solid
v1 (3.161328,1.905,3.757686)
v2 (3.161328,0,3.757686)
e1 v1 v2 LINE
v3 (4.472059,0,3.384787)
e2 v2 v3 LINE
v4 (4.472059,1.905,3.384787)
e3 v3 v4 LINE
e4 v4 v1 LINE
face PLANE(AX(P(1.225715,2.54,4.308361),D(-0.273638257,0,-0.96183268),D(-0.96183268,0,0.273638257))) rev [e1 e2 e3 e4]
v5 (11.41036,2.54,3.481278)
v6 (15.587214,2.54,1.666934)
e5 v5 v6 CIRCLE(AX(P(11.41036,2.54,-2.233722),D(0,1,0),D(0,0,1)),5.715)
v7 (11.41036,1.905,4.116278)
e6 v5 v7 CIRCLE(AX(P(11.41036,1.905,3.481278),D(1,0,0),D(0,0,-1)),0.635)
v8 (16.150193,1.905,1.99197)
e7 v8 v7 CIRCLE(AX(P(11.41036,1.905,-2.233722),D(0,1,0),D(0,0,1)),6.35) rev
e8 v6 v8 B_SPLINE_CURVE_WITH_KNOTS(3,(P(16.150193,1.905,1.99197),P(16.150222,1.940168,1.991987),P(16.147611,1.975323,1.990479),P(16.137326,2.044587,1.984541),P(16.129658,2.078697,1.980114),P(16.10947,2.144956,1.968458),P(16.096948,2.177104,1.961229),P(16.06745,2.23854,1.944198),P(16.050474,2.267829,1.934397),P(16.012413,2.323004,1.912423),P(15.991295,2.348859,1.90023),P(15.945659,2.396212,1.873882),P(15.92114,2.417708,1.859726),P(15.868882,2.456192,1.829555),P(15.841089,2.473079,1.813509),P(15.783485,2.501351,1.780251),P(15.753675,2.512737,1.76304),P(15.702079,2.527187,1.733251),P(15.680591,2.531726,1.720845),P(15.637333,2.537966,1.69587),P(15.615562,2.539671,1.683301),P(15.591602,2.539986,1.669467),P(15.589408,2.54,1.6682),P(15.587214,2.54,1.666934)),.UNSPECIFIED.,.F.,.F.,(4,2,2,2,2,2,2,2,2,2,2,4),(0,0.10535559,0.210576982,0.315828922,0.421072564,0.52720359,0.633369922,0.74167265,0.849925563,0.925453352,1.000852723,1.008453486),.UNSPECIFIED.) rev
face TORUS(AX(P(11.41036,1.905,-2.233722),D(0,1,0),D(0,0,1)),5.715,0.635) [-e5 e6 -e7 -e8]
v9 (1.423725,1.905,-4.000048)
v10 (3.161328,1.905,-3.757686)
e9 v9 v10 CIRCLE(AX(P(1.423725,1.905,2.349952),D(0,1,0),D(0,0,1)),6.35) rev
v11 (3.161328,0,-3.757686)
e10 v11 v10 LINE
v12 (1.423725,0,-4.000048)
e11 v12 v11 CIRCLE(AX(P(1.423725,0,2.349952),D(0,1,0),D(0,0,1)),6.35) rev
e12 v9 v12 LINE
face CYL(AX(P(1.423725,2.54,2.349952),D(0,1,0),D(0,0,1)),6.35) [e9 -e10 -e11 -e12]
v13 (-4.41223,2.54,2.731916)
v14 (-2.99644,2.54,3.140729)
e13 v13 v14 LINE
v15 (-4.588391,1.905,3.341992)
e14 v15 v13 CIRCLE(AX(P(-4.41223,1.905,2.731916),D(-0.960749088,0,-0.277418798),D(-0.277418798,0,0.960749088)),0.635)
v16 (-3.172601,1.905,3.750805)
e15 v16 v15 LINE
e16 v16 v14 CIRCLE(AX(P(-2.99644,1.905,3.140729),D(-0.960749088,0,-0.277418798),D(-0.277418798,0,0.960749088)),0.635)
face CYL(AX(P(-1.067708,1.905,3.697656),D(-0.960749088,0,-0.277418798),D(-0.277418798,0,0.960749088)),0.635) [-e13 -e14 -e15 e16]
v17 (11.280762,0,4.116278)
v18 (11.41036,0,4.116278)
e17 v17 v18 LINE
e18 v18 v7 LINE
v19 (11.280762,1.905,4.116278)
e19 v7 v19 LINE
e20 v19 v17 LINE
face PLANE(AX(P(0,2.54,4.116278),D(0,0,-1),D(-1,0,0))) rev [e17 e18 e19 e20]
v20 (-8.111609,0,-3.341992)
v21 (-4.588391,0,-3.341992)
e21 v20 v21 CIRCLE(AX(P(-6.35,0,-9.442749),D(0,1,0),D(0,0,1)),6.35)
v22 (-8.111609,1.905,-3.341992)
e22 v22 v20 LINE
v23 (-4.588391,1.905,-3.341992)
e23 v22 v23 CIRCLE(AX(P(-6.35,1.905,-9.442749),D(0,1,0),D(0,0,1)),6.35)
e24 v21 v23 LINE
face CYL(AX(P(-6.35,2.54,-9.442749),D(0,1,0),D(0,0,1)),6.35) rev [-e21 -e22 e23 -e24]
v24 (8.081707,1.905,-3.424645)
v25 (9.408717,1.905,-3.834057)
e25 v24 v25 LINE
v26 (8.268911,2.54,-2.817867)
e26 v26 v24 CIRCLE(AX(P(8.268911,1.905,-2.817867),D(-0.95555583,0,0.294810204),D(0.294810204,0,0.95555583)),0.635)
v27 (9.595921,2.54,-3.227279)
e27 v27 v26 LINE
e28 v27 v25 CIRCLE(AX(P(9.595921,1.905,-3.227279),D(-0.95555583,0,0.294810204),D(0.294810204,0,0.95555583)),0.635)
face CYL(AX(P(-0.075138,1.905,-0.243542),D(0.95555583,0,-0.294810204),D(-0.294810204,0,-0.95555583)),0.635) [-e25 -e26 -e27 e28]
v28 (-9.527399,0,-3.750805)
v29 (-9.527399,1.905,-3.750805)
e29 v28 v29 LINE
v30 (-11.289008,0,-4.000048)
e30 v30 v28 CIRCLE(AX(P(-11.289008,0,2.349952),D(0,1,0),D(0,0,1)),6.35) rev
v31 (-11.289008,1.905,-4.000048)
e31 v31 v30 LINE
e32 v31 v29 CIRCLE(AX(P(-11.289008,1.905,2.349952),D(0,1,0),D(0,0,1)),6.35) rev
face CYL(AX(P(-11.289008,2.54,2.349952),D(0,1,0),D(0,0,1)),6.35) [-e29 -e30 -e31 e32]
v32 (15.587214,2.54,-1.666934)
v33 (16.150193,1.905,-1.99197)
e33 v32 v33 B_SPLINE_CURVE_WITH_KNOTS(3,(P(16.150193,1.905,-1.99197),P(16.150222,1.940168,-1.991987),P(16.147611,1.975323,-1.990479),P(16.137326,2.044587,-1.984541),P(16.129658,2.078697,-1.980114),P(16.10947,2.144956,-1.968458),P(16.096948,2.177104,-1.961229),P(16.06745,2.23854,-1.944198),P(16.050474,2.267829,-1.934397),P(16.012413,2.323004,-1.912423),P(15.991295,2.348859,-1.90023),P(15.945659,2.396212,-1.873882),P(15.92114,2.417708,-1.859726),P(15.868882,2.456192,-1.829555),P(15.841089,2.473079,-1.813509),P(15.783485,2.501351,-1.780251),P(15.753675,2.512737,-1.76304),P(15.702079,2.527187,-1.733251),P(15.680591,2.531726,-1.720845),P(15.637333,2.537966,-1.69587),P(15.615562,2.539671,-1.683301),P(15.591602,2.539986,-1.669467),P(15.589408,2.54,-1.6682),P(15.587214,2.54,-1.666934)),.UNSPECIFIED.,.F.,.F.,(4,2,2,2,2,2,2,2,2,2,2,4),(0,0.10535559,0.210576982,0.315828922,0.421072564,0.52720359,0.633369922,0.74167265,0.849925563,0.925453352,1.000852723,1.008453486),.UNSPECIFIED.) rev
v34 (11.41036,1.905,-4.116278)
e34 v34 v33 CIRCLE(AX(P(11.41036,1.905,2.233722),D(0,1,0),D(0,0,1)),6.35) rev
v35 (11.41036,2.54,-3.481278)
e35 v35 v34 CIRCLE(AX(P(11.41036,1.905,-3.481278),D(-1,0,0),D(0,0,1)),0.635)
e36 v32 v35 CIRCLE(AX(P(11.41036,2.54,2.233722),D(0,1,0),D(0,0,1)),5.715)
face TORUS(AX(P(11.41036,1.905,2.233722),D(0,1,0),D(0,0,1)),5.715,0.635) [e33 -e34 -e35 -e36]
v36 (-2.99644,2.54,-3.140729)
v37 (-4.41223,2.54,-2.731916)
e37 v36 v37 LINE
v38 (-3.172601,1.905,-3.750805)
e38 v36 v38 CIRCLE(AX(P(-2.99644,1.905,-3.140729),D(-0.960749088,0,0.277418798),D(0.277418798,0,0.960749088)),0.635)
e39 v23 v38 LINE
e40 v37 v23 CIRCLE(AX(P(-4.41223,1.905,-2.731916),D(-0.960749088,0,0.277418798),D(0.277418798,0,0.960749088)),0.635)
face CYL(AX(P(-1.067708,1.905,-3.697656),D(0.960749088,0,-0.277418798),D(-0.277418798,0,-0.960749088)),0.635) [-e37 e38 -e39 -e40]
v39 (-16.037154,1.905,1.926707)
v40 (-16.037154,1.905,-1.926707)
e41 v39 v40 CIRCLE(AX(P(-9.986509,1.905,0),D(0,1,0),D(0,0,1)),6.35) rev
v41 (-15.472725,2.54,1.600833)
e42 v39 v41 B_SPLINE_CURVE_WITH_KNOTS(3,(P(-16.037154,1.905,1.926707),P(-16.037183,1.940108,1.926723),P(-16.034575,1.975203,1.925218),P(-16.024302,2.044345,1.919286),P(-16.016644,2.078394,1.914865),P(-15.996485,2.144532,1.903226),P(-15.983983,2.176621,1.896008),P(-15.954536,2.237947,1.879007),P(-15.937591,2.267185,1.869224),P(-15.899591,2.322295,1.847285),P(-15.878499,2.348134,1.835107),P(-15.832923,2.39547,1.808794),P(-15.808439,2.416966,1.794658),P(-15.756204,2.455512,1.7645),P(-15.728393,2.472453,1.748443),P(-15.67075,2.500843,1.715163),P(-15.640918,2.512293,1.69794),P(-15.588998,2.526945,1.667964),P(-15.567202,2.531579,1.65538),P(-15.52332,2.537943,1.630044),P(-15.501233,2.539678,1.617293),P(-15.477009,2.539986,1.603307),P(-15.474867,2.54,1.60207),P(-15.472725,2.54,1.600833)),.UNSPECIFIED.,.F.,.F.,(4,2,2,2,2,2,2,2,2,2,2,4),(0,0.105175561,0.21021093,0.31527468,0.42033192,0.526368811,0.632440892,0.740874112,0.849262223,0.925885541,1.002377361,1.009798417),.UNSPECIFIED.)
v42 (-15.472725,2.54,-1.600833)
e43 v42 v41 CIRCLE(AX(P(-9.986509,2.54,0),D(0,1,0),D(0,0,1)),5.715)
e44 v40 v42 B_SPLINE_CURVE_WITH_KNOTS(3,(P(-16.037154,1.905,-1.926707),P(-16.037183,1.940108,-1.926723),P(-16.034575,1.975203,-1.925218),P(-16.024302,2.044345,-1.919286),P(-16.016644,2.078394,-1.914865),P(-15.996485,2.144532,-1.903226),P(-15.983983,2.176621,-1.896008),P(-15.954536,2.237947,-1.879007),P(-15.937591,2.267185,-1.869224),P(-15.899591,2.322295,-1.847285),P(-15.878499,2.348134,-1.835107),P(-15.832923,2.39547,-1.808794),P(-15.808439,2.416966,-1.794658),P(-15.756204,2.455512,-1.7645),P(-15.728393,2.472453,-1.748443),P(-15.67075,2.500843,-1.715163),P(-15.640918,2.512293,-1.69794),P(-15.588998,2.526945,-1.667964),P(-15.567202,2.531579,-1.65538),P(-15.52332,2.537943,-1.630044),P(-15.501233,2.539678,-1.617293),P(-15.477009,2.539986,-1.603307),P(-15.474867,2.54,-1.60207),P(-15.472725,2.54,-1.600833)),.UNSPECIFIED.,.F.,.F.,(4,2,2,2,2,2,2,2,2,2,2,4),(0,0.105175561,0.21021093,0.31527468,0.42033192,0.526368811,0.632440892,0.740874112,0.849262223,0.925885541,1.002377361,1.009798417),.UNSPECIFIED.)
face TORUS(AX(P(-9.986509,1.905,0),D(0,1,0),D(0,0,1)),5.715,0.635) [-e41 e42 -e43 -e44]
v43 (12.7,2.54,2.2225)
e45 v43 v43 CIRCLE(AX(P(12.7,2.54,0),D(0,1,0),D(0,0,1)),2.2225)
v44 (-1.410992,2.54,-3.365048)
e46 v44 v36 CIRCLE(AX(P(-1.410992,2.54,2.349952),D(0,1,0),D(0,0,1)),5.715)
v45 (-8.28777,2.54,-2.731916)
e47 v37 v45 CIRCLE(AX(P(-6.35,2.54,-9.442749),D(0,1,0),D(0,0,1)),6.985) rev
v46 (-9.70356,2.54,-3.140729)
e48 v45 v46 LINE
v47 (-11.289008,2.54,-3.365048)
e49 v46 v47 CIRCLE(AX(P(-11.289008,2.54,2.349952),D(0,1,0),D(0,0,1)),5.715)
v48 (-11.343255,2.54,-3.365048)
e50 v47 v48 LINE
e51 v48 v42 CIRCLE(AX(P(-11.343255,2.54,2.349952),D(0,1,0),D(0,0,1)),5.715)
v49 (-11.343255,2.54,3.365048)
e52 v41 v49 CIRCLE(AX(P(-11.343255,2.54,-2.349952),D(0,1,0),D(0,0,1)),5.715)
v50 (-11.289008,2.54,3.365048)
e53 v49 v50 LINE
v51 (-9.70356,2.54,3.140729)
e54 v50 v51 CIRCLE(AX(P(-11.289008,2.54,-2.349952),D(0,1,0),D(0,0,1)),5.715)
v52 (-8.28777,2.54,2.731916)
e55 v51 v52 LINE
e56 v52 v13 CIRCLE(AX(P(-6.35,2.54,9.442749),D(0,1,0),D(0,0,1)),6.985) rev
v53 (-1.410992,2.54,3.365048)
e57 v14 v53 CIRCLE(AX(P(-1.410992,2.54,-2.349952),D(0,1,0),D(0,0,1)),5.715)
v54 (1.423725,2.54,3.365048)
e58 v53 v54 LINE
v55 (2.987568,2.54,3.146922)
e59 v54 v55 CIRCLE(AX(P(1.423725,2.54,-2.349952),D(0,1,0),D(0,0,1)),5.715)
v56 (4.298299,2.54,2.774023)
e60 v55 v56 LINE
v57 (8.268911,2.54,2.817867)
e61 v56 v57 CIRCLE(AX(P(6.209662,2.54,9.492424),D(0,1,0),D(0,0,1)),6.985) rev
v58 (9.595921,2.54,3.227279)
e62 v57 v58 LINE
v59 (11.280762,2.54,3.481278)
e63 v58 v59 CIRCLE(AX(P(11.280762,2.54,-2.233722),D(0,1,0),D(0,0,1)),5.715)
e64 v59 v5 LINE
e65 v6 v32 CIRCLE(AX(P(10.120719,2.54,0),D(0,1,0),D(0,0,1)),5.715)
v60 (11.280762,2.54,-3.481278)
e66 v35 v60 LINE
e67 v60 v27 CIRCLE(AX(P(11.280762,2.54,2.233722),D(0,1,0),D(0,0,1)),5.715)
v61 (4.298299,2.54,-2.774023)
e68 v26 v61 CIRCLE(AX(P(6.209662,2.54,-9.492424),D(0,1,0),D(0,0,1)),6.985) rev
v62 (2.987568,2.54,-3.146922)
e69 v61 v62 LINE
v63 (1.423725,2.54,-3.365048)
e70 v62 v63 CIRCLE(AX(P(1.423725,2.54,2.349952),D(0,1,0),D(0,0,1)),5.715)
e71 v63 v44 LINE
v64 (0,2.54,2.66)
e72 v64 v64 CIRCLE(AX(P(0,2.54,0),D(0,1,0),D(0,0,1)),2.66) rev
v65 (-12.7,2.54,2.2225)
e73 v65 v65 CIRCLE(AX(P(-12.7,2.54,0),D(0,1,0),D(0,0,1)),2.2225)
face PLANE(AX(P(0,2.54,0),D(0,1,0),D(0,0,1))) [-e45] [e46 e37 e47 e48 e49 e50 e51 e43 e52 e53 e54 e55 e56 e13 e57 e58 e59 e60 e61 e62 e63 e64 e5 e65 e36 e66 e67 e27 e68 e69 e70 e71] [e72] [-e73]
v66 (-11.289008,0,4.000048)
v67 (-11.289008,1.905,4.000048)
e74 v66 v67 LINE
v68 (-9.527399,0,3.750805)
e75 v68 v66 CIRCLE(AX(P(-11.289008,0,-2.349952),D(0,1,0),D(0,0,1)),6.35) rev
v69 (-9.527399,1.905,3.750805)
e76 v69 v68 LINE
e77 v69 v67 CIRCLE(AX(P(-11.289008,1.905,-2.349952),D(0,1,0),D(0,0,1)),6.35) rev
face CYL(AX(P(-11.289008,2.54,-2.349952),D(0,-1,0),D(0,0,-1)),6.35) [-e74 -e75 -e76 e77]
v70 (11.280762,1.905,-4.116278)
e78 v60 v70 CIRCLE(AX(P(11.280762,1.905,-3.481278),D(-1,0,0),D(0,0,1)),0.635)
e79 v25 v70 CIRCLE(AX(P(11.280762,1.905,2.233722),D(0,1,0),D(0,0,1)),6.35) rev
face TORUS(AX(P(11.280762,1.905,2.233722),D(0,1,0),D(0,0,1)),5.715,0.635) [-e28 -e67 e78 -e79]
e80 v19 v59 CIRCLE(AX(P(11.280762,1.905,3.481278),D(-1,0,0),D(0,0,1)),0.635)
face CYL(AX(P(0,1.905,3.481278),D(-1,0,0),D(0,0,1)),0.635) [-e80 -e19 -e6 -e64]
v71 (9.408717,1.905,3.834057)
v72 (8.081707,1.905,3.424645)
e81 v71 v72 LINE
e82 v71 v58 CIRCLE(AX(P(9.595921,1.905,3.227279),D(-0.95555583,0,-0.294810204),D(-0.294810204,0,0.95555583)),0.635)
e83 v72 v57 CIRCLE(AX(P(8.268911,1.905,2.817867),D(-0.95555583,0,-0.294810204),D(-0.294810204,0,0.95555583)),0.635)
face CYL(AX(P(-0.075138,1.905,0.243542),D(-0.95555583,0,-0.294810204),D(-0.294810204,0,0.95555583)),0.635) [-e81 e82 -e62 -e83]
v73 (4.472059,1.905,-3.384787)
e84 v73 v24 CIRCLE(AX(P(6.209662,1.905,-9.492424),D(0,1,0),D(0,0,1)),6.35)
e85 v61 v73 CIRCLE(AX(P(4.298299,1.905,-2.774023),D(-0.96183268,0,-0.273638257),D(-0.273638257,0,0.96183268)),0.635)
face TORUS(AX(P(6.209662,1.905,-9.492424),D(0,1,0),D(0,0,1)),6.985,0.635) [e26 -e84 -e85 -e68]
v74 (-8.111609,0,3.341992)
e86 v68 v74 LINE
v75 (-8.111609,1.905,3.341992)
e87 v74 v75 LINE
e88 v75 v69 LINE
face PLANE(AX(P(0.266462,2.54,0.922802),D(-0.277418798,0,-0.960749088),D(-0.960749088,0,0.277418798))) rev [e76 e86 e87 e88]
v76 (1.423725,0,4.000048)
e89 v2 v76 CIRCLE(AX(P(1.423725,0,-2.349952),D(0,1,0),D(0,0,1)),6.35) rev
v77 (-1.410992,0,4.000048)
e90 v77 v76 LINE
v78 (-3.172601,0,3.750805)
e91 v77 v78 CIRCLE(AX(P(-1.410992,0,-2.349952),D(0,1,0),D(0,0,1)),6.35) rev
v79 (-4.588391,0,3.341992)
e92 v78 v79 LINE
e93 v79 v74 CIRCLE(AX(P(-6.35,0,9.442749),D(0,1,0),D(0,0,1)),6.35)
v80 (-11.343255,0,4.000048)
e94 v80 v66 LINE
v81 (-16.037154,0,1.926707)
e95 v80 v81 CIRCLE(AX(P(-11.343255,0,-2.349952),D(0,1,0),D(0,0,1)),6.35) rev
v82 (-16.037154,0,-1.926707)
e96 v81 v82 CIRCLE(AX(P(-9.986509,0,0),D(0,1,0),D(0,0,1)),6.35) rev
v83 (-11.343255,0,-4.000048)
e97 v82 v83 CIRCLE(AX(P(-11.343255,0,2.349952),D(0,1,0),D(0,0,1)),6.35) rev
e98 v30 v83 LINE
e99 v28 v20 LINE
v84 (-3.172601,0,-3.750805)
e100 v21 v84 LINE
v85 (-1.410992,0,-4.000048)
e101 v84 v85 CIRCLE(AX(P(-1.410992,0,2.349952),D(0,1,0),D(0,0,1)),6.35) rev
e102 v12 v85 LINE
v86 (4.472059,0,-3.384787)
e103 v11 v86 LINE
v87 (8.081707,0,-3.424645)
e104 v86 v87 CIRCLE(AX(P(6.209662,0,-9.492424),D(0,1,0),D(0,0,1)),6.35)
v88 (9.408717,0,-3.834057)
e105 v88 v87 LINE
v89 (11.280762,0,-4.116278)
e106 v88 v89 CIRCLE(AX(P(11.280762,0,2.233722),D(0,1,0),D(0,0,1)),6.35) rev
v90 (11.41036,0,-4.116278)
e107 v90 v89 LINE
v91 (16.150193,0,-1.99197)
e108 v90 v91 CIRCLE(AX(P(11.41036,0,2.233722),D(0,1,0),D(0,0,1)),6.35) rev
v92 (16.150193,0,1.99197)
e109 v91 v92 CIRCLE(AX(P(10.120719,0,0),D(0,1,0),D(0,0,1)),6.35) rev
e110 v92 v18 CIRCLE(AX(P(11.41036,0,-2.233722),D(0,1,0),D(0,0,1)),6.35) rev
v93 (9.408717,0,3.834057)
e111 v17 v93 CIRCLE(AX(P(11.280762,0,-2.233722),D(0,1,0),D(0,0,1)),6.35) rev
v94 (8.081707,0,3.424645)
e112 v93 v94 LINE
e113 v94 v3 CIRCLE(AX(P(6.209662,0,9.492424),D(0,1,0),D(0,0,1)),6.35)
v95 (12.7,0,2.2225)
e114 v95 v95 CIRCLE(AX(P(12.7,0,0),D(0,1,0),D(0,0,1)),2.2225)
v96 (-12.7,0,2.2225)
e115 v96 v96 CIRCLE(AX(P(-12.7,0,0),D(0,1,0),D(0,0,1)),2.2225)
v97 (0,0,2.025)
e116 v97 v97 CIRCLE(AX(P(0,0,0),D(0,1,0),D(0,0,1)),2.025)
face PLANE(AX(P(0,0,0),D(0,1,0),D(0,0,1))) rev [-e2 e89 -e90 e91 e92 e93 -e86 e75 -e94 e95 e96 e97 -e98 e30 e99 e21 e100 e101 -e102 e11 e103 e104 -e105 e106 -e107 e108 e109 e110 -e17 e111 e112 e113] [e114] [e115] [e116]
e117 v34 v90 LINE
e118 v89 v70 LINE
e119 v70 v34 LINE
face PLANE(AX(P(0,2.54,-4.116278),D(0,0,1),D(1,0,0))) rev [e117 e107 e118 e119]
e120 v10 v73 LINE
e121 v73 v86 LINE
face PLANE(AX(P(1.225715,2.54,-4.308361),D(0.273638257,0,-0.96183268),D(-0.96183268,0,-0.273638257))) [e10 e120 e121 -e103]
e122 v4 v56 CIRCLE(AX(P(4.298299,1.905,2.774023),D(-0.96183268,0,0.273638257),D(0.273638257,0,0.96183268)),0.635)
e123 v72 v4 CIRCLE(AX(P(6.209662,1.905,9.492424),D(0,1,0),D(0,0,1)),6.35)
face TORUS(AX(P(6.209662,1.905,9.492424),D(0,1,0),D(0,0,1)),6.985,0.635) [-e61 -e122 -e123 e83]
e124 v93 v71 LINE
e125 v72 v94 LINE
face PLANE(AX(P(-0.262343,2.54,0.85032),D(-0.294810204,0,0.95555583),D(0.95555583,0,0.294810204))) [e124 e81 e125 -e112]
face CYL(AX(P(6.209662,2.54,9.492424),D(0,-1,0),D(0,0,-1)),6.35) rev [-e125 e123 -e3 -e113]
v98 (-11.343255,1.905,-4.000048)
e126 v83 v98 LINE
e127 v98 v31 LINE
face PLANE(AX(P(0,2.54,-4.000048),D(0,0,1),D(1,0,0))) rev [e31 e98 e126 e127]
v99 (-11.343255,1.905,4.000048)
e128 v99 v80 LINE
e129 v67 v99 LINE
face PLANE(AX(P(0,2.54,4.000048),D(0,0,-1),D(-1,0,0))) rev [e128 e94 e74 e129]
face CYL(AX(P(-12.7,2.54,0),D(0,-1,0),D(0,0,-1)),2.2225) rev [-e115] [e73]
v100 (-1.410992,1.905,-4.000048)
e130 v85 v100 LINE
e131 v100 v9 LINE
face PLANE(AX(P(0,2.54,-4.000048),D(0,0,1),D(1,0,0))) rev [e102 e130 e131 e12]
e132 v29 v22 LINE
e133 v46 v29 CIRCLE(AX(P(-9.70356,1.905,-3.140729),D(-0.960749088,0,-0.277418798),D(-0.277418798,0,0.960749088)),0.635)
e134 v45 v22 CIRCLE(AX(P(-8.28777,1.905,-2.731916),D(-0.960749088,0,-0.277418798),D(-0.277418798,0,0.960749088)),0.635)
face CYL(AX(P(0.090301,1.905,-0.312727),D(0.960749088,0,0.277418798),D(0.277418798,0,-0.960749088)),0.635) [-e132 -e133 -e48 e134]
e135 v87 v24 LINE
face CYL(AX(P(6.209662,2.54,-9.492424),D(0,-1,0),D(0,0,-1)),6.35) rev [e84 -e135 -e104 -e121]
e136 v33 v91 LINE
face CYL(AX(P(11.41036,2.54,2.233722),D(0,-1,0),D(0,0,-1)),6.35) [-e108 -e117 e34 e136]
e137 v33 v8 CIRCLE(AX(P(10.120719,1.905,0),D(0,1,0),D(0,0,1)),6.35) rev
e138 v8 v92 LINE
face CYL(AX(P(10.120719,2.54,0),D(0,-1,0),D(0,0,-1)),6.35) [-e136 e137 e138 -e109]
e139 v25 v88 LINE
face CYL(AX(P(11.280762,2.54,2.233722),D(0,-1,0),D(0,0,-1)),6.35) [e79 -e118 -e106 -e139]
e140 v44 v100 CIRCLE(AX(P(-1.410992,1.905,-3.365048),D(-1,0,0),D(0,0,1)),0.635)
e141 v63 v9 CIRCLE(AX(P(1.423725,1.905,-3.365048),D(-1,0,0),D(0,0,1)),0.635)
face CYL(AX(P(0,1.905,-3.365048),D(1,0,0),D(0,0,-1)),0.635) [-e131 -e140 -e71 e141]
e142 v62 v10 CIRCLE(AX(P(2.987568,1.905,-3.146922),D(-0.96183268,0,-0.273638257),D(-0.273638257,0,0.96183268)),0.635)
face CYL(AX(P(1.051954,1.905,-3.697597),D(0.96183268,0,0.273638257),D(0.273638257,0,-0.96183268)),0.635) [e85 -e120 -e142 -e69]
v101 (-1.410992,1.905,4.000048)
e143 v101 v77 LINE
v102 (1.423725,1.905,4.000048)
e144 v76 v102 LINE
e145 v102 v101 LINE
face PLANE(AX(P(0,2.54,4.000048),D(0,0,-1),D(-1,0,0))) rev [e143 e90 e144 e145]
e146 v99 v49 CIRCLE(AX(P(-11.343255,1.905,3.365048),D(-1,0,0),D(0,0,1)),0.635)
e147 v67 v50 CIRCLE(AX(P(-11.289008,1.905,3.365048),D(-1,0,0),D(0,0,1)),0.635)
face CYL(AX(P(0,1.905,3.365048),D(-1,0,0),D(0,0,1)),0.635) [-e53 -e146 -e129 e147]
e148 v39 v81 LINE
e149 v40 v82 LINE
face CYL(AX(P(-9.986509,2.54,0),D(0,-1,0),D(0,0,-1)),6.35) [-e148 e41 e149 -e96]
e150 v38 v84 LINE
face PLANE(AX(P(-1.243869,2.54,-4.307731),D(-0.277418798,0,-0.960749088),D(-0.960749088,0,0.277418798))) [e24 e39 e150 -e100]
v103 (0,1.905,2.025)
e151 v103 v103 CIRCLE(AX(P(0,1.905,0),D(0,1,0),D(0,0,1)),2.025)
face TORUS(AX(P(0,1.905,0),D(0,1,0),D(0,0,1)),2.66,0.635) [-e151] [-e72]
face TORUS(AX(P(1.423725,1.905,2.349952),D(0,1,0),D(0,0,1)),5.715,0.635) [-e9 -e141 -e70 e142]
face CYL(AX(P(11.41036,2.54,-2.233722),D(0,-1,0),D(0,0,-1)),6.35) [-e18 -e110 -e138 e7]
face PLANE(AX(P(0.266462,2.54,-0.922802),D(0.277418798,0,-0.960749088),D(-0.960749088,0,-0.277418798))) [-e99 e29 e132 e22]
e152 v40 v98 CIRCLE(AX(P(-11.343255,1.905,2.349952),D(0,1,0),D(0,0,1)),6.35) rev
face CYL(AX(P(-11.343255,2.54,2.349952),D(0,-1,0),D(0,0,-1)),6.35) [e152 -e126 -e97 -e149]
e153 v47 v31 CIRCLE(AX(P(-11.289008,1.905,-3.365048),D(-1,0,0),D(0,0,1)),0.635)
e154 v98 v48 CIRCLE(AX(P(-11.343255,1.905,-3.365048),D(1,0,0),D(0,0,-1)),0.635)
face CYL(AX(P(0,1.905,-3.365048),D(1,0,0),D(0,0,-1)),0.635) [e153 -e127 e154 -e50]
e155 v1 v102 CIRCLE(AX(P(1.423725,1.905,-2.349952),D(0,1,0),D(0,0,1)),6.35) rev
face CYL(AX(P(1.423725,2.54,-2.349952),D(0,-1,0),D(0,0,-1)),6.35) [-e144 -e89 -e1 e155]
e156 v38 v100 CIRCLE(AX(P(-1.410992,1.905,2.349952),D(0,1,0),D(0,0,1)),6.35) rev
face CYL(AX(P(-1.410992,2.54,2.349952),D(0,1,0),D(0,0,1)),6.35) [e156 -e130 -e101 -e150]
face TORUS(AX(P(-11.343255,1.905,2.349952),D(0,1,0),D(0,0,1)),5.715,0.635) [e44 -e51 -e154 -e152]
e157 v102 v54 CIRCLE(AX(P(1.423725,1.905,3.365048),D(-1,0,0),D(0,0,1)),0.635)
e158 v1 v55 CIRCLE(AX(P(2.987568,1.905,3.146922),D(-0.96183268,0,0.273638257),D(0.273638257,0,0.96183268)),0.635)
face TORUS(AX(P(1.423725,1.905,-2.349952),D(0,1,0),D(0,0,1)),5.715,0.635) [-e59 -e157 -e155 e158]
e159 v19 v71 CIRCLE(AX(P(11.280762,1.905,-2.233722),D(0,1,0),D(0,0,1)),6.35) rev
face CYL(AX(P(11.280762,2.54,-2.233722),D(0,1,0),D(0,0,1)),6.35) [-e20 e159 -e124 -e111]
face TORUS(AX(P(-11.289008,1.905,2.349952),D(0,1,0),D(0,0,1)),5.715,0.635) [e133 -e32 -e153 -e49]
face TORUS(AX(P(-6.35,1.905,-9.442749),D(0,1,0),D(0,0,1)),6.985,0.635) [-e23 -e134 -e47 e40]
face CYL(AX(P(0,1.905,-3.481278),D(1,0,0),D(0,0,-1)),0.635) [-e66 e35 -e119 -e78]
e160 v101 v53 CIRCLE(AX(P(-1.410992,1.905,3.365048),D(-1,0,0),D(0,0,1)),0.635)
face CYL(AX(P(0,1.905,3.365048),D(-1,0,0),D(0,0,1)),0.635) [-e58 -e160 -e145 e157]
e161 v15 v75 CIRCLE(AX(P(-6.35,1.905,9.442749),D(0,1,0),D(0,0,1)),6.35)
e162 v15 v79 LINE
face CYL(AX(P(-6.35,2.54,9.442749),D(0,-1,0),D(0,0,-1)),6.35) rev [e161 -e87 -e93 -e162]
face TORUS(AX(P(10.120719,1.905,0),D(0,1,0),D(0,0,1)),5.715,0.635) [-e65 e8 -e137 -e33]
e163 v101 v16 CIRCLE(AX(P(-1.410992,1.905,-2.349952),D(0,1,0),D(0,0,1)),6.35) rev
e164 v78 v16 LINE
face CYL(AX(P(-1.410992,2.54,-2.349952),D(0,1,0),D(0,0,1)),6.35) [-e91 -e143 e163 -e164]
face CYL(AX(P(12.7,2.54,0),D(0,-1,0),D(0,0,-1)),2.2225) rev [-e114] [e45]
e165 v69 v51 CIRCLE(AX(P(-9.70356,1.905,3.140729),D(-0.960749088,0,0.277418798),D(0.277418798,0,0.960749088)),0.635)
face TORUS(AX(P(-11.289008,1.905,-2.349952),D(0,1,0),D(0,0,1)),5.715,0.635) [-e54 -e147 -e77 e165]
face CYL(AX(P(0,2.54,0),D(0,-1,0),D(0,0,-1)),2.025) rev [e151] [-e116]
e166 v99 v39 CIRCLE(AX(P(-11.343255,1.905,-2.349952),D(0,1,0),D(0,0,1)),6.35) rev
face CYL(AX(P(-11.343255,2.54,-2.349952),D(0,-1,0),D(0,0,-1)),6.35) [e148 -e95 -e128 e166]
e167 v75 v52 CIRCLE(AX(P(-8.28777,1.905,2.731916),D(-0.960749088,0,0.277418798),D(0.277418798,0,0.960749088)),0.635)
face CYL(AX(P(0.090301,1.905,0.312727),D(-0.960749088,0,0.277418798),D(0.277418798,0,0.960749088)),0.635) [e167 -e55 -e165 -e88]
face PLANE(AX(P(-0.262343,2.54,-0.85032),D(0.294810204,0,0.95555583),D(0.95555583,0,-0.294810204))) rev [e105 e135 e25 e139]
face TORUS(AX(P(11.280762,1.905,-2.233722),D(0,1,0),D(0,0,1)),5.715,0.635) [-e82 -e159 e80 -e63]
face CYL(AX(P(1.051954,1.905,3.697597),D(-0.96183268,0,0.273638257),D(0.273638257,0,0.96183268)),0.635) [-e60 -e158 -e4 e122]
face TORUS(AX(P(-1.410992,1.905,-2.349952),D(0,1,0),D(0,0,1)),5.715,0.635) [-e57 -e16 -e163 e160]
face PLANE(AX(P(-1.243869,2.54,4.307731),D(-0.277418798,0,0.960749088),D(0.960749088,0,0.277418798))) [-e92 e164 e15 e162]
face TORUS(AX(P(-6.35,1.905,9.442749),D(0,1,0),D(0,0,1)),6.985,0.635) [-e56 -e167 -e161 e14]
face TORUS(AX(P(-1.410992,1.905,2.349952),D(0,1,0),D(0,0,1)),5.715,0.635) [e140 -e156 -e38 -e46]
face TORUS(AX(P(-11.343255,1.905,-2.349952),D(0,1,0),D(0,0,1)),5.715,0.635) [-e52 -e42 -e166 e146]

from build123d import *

# Parameters (mm, degrees)
BOSS_EXTRUDE3_DEPTH = 2.54
FILLET1_R           = 6.35
FILLET2_R           = 0.635


with BuildPart() as part:
    # Sketch2 → Boss-Extrude3 (new body)
    with BuildSketch(Plane(origin=(0, 0, 0), x_dir=(1, 0, 0), z_dir=(0, 1, 0))):
        with BuildLine():
            ThreePointArc((-14.9225, 0), (-12.7, 2.2225), (-10.4775, 0))
            Line((-10.4775, 0), (-8.081142289, 0))
            Line((-8.081142289, 0), (-9.450372471, 2.371576242))
            Line((-9.450372471, 2.371576242), (-10.390571145, 4.000048114))
            Line((-10.390571145, 4.000048114), (-15.009428855, 4.000048114))
            Line((-15.009428855, 4.000048114), (-17.318857711, 0))
            Line((-17.318857711, 0), (-14.9225, 0))
        make_face()
        with BuildLine():
            Line((-8.081142289, 0), (-10.4775, 0))
            ThreePointArc((-10.4775, 0), (-12.7, -2.2225), (-14.9225, 0))
            Line((-14.9225, 0), (-17.318857711, 0))
            Line((-17.318857711, 0), (-15.009428855, -4.000048114))
            Line((-15.009428855, -4.000048114), (-10.390571145, -4.000048114))
            Line((-10.390571145, -4.000048114), (-9.235856717, -2.000024057))
            Line((-9.235856717, -2.000024057), (-8.081142289, 0))
        make_face()
        Polygon((-9.450372471, 2.371576242), (-8.081142289, 0), (-4.618857711, 0), (-3.464143283, 2.000024057), (-2.309428855, 4.000048114), (-6.35, 2.833322689), (-10.390571145, 4.000048114), align=None)
        Polygon((-4.618857711, 0), (-8.081142289, 0), (-9.235856717, -2.000024057), (-10.390571145, -4.000048114), (-6.35, -2.833322689), (-2.309428855, -4.000048114), (-3.464143283, -2.000024057), align=None)
        with BuildLine():
            Line((-3.464143283, 2.000024057), (-4.618857711, 0))
            Line((-4.618857711, 0), (-2.025, 0))
            ThreePointArc((-2.025, 0), (0, 2.025), (2.025, 0))
            Line((2.025, 0), (4.618857711, 0))
            Line((4.618857711, 0), (3.464143283, 2.000024057))
            Line((3.464143283, 2.000024057), (2.309428855, 4.000048114))
            Line((2.309428855, 4.000048114), (-2.309428855, 4.000048114))
            Line((-2.309428855, 4.000048114), (-3.464143283, 2.000024057))
        make_face()
        with BuildLine():
            Line((-2.025, 0), (-4.618857711, 0))
            Line((-4.618857711, 0), (-3.464143283, -2.000024057))
            Line((-3.464143283, -2.000024057), (-2.309428855, -4.000048114))
            Line((-2.309428855, -4.000048114), (2.309428855, -4.000048114))
            Line((2.309428855, -4.000048114), (3.464143283, -2.000024057))
            Line((3.464143283, -2.000024057), (4.618857711, 0))
            Line((4.618857711, 0), (2.025, 0))
            ThreePointArc((2.025, 0), (0, -2.025), (-2.025, 0))
        make_face()
        Polygon((3.464143283, 2.000024057), (4.618857711, 0), (7.946932116, 0), (9.135199087, 2.058138767), (10.323466058, 4.116277534), (6.282791089, 2.86963953), (2.309428855, 4.000048114), align=None)
        Polygon((7.946932116, 0), (4.618857711, 0), (3.464143283, -2.000024057), (2.309428855, -4.000048114), (6.282791089, -2.86963953), (10.323466058, -4.116277534), (9.135199087, -2.058138767), align=None)
        with BuildLine():
            Line((9.135199087, 2.058138767), (7.946932116, 0))
            Line((7.946932116, 0), (10.4775, 0))
            ThreePointArc((10.4775, 0), (12.7, 2.2225), (14.9225, 0))
            Line((14.9225, 0), (17.453067884, 0))
            Line((17.453067884, 0), (15.076533942, 4.116277534))
            Line((15.076533942, 4.116277534), (10.323466058, 4.116277534))
            Line((10.323466058, 4.116277534), (9.135199087, 2.058138767))
        make_face()
        with BuildLine():
            Line((10.4775, 0), (7.946932116, 0))
            Line((7.946932116, 0), (9.135199087, -2.058138767))
            Line((9.135199087, -2.058138767), (10.323466058, -4.116277534))
            Line((10.323466058, -4.116277534), (15.076533942, -4.116277534))
            Line((15.076533942, -4.116277534), (17.453067884, 0))
            Line((17.453067884, 0), (14.9225, 0))
            ThreePointArc((14.9225, 0), (12.7, -2.2225), (10.4775, 0))
        make_face()
    extrude(amount=BOSS_EXTRUDE3_DEPTH)

    # Fillet1
    # the kernel refuses this fillet: 6.35 mm, written as the material it adds along each edge
    with BuildSketch(Plane(origin=(-6.35, 0, -2.833322689), x_dir=(-0.9607490883142406, 0, -0.2774187976748433), z_dir=(0, 1, 0)), Plane(origin=(-6.35, 0, 2.833322689), x_dir=(0.9607490883142819, 0, 0.27741879767470035), z_dir=(0, 1, 0))) as fillet1_piece_1:
        with BuildLine():
            CenterArc((FILLET1_R * 0.288752600496, -FILLET1_R), FILLET1_R, 90, 32.212421432)
            Line((-FILLET1_R * 0.244307113399, -FILLET1_R * 0.153922378607), (0, 0))
            Line((0, 0), (FILLET1_R * 0.288752600496, 0))
        make_face()
    extrude(amount=2.54)
    with BuildSketch(Plane(origin=(6.282791089, 0, -2.86963953), x_dir=(-0.9618326798752038, 0, -0.27363825742041953), z_dir=(0, 1, 0)), Plane(origin=(6.282791089, 0, 2.86963953), x_dir=(0.9555558296704232, 0, 0.2948102040005893), z_dir=(0, 1, 0))) as fillet1_piece_2:
        with BuildLine():
            CenterArc((FILLET1_R * 0.296470151245, -FILLET1_R), FILLET1_R, 90, 33.027036352)
            Line((-FILLET1_R * 0.248564569422, -FILLET1_R * 0.16158652607), (0, 0))
            Line((0, 0), (FILLET1_R * 0.296470151245, 0))
        make_face()
    extrude(amount=2.54)
    # the kernel refuses this fillet: 6.35 mm, written as the material it takes off along each edge
    with BuildSketch(Plane(origin=(-10.390571145, -2.246092292, -4.000048114), x_dir=(-1, 0, 0), z_dir=(0, 1, 0))) as fillet1_2_piece_1:
        with BuildLine():
            CenterArc((FILLET1_R * 0.141486128607, FILLET1_R), FILLET1_R, 253.893789284, 16.106210716)
            Line((-FILLET1_R * 0.135932669068, FILLET1_R * 0.0392509116858), (0, 0))
            Line((0, 0), (FILLET1_R * 0.141486128607, 0))
        make_face()
    extrude(amount=7.032184583, mode=Mode.SUBTRACT)
    with BuildSketch(Plane(origin=(-2.309428855, -2.246092292, -4.000048114), x_dir=(1, 0, 0), z_dir=(0, 1, 0)), Plane(origin=(-2.309428855, -2.246092292, 4.000048114), x_dir=(-0.9607490883142817, 0, -0.2774187976747005), z_dir=(0, 1, 0)), Plane(origin=(-10.390571145, -2.246092292, 4.000048114), x_dir=(-1, 0, 0), z_dir=(0, 1, 0))) as fillet1_2_piece_2:
        with BuildLine():
            CenterArc((FILLET1_R * 0.141486128607, -FILLET1_R), FILLET1_R, 90, 16.106210716)
            Line((-FILLET1_R * 0.135932669068, -FILLET1_R * 0.0392509116857), (0, 0))
            Line((0, 0), (FILLET1_R * 0.141486128607, 0))
        make_face()
    extrude(amount=7.032184583, mode=Mode.SUBTRACT)
    with BuildSketch(Plane(origin=(2.309428855, -2.214259851, -4.000048114), x_dir=(0.9618326798752038, 0, 0.27363825742041936), z_dir=(0, 1, 0)), Plane(origin=(2.309428855, -2.214259851, 4.000048114), x_dir=(-1, 0, 0), z_dir=(0, 1, 0))) as fillet1_2_piece_3:
        with BuildLine():
            CenterArc((FILLET1_R * 0.139480935468, -FILLET1_R), FILLET1_R, 90, 15.880879627)
            Line((-FILLET1_R * 0.134157321953, -FILLET1_R * 0.0381673201248), (0, 0))
            Line((0, 0), (FILLET1_R * 0.139480935468, 0))
        make_face()
    extrude(amount=6.968519701, mode=Mode.SUBTRACT)
    with BuildSketch(Plane(origin=(10.323466058, -2.39323875, -4.116277534), x_dir=(1, 0, 0), z_dir=(0, 1, 0)), Plane(origin=(10.323466058, -2.39323875, 4.116277534), x_dir=(-0.9555558296704234, 0, -0.294810204000589), z_dir=(0, 1, 0))) as fillet1_2_piece_4:
        with BuildLine():
            CenterArc((FILLET1_R * 0.150755196823, -FILLET1_R), FILLET1_R, 90, 17.146156725)
            Line((-FILLET1_R * 0.144055007178, -FILLET1_R * 0.0444441703296), (0, 0))
            Line((0, 0), (FILLET1_R * 0.150755196823, 0))
        make_face()
    extrude(amount=7.326477499, mode=Mode.SUBTRACT)
    with BuildSketch(Plane(origin=(15.076533942, -9.165435523, -4.116277534), x_dir=(0.500000000000005, 0, 0.8660254037844358), z_dir=(0, 1, 0)), Plane(origin=(17.453067884, -9.165435523, 0), x_dir=(-0.49999999999999534, 0, 0.8660254037844413), z_dir=(0, 1, 0)), Plane(origin=(15.076533942, -9.165435523, 4.116277534), x_dir=(-1, 0, 0), z_dir=(0, 1, 0)), Plane(origin=(-15.009428855, -9.165435523, 4.000048114), x_dir=(-0.5000000000000033, 0, -0.8660254037844367), z_dir=(0, 1, 0)), Plane(origin=(-17.318857711, -9.165435523, 0), x_dir=(0.4999999999999972, 0, -0.8660254037844403), z_dir=(0, 1, 0)), Plane(origin=(-15.009428855, -9.165435523, -4.000048114), x_dir=(1, 0, 0), z_dir=(0, 1, 0))) as fillet1_2_piece_5:
        with BuildLine():
            CenterArc((FILLET1_R * 0.57735026919, -FILLET1_R), FILLET1_R, 90, 60)
            Line((-FILLET1_R * 0.288675134595, -FILLET1_R * 0.5), (0, 0))
            Line((0, 0), (FILLET1_R * 0.57735026919, 0))
        make_face()
    extrude(amount=20.870871047, mode=Mode.SUBTRACT)

    # Fillet2
    fillet2_edges = [part.edges().sort_by_distance(p)[0] for p in [
        (-2.025, 2.54, 0),
        (-8.819504031, 2.54, -3.546398399),
        (8.745211682, 2.54, 3.629350993),
        (11.345560645, 2.54, 4.116277534),
        (11.345560645, 2.54, -4.116277534),
        (8.745211682, 2.54, -3.629350993),
        (3.81669336, 2.54, -3.571236283),
        (0.006366488, 2.54, -4.000048114),
        (-3.880495969, 2.54, -3.546398399),
        (-11.316131354, 2.54, 4.000048114),
        (-8.819504031, 2.54, 3.546398399),
        (-3.880495969, 2.54, 3.546398399),
        (0.006366488, 2.54, 4.000048114),
        (3.81669336, 2.54, 3.571236283),
        (-13.908962899, 2.54, -3.458631518),
        (-16.336509292, 2.54, 0),
        (-13.908962899, 2.54, 3.458631518),
        (-10.399430946, 2.54, 3.937428535),
        (-2.300569054, 2.54, 3.937428535),
        (2.30093691, 2.54, 3.939165629),
        (10.334162366, 2.54, 4.045326026),
        (14.007411183, 2.54, 3.560915034),
        (16.470719465, 2.54, 0),
        (14.007411183, 2.54, -3.560915034),
        (10.334162366, 2.54, -4.045326026),
        (2.30093691, 2.54, -3.939165629),
        (-2.300569054, 2.54, -3.937428535),
        (-10.399430946, 2.54, -3.937428535),
        (-6.35, 2.54, -3.092748685),
        (6.279774704, 2.54, -3.142811536),
        (6.279774704, 2.54, 3.142811536),
        (-6.35, 2.54, 3.092748685),
        (-11.316131354, 2.54, -4.000048114),
    ]]
    fillet(fillet2_edges, radius=FILLET2_R)


solid = part.part
